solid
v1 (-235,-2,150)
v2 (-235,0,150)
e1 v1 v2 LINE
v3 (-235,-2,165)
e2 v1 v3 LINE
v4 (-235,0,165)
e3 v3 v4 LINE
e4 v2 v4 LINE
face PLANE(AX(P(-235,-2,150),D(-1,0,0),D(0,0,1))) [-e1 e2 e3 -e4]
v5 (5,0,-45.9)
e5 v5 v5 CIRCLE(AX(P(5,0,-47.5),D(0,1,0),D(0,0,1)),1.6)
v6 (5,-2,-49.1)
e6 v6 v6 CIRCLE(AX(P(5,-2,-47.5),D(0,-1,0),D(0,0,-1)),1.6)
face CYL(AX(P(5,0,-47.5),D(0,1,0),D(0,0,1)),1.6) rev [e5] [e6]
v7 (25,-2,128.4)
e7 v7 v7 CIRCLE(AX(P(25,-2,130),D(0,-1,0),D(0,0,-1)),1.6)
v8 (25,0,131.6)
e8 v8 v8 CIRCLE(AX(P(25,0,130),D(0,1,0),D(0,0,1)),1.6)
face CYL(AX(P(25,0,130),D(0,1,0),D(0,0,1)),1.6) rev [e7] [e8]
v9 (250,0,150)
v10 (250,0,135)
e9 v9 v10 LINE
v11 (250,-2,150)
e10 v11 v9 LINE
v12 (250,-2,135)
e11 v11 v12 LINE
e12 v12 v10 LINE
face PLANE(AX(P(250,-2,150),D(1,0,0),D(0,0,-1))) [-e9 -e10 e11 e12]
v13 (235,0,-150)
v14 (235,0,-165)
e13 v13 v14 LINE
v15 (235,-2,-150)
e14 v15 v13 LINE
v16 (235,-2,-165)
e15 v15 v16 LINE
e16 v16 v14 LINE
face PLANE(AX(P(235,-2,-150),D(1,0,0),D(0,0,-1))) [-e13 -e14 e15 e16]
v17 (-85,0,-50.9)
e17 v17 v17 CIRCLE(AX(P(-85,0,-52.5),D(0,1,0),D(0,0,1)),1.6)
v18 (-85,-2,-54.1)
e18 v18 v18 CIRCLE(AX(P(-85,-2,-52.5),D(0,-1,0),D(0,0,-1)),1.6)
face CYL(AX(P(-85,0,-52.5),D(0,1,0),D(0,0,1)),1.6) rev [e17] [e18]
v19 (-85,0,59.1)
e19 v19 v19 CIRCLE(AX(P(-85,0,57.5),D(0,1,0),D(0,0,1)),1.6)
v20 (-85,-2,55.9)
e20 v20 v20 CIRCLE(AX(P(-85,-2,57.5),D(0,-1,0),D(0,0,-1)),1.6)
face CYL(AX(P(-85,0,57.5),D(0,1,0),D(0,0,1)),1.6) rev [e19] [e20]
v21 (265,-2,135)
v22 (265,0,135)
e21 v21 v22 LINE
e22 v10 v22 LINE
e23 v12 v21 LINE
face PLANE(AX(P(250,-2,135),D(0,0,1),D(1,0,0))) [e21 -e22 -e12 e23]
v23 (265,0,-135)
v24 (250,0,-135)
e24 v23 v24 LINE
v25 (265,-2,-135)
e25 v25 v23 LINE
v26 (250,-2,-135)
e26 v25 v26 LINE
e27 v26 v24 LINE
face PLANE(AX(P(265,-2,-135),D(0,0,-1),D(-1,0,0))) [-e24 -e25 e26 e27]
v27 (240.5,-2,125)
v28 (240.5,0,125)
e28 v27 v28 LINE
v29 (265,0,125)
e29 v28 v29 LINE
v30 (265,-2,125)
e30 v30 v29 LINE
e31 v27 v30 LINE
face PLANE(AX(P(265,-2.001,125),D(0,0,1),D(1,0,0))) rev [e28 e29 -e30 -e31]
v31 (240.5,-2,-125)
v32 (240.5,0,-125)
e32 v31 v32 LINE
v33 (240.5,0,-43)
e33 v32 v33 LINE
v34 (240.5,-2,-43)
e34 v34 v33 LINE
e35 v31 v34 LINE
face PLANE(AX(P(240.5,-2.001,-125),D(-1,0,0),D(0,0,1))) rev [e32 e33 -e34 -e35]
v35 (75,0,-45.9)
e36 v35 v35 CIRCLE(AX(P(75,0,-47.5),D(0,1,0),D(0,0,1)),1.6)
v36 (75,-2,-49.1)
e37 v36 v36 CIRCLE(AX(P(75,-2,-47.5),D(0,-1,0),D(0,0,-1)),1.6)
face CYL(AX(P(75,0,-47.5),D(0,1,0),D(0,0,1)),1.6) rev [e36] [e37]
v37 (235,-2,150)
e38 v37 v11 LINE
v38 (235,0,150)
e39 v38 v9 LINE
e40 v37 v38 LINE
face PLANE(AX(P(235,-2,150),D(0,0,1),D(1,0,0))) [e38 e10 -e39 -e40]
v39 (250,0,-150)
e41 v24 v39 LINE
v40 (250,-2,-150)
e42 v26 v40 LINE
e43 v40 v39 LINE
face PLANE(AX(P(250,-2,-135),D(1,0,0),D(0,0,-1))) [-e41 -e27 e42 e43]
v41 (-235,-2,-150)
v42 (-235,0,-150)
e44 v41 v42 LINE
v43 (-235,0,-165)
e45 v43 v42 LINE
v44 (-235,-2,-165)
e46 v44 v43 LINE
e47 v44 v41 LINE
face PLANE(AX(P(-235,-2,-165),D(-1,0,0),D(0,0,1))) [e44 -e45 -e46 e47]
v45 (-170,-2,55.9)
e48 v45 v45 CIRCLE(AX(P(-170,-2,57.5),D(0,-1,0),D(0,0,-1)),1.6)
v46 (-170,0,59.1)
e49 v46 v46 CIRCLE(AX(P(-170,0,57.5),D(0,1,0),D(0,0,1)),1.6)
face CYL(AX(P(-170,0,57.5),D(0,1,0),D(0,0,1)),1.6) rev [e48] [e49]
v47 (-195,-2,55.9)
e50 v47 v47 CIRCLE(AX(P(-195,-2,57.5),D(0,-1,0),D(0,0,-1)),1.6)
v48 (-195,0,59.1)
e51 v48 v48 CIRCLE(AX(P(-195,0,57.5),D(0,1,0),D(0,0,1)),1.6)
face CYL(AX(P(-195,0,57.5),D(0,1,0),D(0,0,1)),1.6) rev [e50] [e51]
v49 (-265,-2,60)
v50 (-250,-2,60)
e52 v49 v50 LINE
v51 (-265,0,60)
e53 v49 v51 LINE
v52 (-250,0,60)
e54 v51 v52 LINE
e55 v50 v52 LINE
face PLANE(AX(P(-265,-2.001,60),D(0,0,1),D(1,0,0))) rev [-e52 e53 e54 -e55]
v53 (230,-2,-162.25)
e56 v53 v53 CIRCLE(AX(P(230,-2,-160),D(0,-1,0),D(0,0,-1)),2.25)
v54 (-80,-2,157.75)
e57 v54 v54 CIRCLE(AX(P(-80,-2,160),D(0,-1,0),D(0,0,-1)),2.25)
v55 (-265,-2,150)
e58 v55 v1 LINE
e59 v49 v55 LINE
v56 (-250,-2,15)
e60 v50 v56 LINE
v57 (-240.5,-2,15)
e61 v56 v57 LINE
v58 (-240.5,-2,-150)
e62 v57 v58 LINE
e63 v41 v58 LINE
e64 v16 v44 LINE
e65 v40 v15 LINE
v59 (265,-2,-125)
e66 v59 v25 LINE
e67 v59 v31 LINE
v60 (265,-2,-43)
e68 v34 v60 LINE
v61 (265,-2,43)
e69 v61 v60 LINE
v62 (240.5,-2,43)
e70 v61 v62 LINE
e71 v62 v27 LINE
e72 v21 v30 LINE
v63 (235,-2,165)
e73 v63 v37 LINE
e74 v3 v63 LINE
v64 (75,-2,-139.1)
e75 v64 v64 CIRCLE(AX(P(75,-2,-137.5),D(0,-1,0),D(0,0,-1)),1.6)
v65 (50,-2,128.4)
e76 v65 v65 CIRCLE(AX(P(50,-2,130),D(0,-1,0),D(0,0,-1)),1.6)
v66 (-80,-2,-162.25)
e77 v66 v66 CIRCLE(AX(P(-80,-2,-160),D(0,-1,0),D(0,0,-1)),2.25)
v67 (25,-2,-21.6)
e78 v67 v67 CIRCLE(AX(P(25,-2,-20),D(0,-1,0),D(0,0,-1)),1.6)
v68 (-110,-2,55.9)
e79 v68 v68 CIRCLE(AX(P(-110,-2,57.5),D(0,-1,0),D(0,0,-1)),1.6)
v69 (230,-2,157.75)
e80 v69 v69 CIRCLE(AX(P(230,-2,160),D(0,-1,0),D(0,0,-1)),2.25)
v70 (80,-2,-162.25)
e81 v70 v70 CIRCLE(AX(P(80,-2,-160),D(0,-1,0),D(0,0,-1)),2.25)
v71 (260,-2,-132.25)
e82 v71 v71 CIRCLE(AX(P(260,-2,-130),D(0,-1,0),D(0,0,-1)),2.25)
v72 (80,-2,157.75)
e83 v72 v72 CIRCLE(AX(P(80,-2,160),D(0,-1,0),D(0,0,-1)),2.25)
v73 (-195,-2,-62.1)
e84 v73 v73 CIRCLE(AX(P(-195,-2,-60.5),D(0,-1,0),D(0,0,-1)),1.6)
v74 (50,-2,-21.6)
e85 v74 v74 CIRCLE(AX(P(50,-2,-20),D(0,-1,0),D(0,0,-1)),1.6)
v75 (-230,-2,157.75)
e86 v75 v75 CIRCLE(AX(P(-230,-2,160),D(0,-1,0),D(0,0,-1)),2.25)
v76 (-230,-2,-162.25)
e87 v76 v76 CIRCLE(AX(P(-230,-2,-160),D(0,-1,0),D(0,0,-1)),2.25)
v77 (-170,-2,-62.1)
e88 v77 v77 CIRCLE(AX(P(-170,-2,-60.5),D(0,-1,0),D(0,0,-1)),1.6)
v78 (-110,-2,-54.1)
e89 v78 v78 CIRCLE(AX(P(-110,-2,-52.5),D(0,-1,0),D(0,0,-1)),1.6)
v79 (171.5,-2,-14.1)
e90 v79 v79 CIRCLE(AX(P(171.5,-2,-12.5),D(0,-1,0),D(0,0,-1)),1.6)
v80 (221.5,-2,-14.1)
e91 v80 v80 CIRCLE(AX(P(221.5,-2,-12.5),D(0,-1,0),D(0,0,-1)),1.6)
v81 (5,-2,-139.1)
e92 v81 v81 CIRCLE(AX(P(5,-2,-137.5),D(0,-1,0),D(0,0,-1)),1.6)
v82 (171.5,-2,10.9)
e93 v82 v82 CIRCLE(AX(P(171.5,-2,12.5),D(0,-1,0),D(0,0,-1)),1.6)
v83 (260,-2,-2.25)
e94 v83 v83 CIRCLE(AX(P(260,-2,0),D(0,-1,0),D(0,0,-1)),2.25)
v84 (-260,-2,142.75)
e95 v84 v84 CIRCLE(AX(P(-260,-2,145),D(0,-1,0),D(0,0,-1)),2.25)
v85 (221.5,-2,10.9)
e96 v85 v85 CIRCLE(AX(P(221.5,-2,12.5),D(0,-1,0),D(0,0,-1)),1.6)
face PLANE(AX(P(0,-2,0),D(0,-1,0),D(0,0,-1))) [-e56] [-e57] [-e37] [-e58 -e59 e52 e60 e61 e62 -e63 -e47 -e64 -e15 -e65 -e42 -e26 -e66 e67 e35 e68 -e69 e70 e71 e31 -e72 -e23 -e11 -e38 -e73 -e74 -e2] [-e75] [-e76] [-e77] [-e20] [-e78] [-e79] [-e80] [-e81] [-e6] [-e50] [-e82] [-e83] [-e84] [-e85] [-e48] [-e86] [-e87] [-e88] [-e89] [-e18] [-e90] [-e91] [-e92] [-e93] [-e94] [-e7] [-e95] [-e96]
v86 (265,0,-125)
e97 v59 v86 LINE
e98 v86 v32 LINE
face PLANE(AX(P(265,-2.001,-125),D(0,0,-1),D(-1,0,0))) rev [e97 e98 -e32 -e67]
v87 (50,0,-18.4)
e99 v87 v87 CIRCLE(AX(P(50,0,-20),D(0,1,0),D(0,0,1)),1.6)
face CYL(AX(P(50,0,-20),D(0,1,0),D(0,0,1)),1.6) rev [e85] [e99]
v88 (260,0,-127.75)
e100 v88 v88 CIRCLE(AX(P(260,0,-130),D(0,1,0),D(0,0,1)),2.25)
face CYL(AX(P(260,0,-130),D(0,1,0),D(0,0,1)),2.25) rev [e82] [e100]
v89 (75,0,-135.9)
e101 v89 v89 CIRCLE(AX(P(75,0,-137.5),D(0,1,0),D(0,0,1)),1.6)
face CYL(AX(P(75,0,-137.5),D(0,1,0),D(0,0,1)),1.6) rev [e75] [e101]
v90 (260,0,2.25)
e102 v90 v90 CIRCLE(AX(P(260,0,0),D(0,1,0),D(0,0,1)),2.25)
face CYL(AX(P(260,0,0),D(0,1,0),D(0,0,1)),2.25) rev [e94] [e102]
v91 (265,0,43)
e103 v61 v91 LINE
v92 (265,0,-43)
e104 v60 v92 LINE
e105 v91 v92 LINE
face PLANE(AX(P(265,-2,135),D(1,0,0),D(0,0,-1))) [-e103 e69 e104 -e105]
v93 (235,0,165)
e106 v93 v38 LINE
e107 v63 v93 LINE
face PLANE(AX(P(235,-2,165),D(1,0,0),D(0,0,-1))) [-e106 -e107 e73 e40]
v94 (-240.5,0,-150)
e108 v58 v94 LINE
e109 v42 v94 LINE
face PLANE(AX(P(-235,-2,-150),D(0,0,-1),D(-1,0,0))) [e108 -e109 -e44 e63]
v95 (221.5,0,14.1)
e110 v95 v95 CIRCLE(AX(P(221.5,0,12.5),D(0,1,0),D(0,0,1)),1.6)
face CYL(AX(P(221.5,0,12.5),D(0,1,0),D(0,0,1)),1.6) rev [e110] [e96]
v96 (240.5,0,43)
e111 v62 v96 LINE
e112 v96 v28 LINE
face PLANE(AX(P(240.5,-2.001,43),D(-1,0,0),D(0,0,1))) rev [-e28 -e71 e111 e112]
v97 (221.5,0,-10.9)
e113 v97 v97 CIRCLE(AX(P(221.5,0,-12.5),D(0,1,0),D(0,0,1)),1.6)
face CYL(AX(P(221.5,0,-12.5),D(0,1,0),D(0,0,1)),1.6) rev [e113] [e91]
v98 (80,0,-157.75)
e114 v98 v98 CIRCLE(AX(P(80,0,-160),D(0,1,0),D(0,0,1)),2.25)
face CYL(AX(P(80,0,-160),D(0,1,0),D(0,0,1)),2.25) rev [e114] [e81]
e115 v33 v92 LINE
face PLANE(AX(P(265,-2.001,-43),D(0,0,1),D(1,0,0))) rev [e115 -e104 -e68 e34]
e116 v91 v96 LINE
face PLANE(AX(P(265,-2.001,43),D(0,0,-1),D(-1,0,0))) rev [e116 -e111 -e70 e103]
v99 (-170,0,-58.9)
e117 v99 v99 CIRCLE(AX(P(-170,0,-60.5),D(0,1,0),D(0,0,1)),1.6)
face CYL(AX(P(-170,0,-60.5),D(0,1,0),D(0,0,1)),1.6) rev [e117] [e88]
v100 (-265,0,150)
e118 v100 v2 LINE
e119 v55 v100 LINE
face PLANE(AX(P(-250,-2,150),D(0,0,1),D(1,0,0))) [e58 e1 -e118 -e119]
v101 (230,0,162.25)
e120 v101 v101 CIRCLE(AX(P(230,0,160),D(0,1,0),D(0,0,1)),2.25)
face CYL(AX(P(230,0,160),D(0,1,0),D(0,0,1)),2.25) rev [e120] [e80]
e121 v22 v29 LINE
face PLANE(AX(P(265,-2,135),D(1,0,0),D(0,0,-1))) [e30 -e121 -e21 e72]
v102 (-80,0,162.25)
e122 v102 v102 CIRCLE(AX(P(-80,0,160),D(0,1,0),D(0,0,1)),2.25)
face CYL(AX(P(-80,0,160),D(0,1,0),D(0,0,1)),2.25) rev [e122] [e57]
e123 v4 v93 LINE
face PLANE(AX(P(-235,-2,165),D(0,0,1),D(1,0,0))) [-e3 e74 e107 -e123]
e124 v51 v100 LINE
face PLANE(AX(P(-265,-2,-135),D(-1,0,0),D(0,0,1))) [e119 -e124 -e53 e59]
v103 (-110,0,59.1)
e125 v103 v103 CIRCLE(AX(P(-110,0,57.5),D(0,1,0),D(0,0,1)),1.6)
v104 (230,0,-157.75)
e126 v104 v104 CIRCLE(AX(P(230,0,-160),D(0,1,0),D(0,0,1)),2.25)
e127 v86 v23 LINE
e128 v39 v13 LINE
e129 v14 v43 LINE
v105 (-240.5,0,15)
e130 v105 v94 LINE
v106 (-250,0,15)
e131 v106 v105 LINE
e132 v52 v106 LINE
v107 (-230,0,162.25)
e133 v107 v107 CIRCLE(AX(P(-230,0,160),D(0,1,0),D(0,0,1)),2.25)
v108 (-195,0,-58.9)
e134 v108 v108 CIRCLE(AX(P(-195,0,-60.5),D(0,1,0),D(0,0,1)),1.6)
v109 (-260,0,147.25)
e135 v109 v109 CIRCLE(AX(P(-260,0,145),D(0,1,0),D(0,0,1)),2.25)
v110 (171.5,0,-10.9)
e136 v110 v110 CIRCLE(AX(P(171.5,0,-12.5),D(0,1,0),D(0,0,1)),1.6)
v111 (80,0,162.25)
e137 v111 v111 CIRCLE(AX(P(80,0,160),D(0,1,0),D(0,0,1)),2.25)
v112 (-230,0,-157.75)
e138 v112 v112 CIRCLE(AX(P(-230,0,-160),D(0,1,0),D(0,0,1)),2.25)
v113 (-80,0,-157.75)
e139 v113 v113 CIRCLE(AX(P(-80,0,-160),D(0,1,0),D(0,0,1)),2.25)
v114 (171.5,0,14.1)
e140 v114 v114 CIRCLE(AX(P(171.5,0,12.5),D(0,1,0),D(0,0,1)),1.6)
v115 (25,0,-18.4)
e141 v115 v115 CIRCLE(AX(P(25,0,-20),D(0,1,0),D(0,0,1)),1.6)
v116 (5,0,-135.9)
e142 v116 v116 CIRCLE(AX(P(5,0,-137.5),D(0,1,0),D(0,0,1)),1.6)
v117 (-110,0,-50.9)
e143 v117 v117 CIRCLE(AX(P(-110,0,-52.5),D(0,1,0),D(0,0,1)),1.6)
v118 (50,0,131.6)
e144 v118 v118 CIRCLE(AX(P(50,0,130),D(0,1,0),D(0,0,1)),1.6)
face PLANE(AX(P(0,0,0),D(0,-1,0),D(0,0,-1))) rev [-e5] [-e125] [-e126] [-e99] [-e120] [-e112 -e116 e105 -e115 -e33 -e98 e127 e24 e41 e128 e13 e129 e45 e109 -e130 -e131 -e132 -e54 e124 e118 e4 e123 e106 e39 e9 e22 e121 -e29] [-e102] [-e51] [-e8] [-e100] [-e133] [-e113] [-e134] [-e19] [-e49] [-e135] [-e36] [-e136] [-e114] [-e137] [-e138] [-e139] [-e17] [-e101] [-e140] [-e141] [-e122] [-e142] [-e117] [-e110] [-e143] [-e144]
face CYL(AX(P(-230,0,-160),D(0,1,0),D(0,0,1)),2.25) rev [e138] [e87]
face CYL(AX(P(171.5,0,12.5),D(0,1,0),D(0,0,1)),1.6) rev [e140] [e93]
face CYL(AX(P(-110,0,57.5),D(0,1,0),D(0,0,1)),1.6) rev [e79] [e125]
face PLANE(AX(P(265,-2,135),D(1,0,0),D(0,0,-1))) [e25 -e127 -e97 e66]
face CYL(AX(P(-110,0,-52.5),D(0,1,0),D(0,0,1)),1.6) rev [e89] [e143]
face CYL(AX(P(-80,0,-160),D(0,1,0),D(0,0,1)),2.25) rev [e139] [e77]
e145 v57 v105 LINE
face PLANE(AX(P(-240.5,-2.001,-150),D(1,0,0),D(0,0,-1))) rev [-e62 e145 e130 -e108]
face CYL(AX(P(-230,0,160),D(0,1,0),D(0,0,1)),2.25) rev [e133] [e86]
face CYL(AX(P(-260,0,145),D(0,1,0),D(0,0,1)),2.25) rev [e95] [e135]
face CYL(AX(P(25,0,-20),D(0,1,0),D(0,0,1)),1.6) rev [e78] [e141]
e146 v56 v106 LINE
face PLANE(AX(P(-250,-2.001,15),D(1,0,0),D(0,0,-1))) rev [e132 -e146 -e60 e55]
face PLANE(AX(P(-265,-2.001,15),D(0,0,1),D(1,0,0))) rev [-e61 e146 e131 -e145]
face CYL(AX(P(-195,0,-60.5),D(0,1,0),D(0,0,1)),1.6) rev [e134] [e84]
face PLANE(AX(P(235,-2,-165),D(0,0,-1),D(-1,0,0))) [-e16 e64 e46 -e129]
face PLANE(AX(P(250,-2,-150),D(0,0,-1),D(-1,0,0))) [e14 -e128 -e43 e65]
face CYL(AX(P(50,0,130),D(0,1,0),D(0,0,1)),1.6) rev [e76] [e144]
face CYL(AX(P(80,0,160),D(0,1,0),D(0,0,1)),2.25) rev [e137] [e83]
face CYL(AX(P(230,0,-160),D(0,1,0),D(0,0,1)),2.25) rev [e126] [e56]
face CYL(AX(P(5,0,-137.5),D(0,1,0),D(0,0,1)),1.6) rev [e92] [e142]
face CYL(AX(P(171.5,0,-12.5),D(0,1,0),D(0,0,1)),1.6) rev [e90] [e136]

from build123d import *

# Parameters (mm, degrees)
BASE_FLANGE1_DEPTH       = 2
SKETCH3_W                = 15
SKETCH3_H                = 15
TAB1_DEPTH               = 2
CUT_EXTRUDE1_REACH       = 314.176
SKETCH4_W                = 15
SKETCH4_H                = 45
M4_CLEARANCE_HOLE1_D     = 4.5
M4_CLEARANCE_HOLE1_DEPTH = 2
M3_CLEARANCE_HOLE1_D     = 3.2
CUT_EXTRUDE2_REACH       = 314.176
SKETCH10_W               = 24.5
SKETCH10_H               = 82
CUT_EXTRUDE3_REACH       = 314.176
SKETCH11_W               = 24.5
SKETCH11_H               = 165


# Sheet-metal steps are written as plain solids
with BuildPart() as part:
    # Sketch1 → Base-Flange1 (new body)
    with BuildSketch(Plane(origin=(0, 0, 0), x_dir=(1, 0, 0), z_dir=(0, 1, 0))):
        Polygon((-250, -150), (-235, -150), (-235, -165), (235, -165), (235, -150), (250, -150), (250, -135), (265, -135), (265, 135), (250, 135), (250, 150), (235, 150), (235, 165), (-235, 165), (-235, 150), (-250, 150), (-250, 135), (-265, 135), (-265, -135), (-250, -135), align=None)
    extrude(amount=-BASE_FLANGE1_DEPTH)

    # Sketch3 → Tab1 (add)
    with BuildSketch(Plane(origin=(0, 0, 0), x_dir=(1, 0, 0), z_dir=(0, 1, 0))):
        with Locations((-257.5, -142.5)):
            Rectangle(SKETCH3_W, SKETCH3_H)
    extrude(amount=-TAB1_DEPTH)

    # Sketch4 → Cut-Extrude1 (cut, up to next)
    with BuildSketch(Plane(origin=(0, 0, 0), x_dir=(1, 0, 0), z_dir=(0, 1, 0)), mode=Mode.PRIVATE) as cut_extrude1_sk1:
        with Locations((-257.5, -37.5)):
            Rectangle(SKETCH4_W, SKETCH4_H)
    cut_extrude1_tool1 = extrude(cut_extrude1_sk1.sketch, amount=-CUT_EXTRUDE1_REACH, mode=Mode.PRIVATE) & part.part
    add(cut_extrude1_tool1.solids().sort_by_distance((-257.5, 0, 37.5))[0], mode=Mode.SUBTRACT)

    # M4 Clearance Hole1
    with Locations(Plane(origin=(0, 0, 0), x_dir=(1, 0, 0), z_dir=(0, 1, 0))):
        with Locations((-260, -145), (-260, 0), (-260, 130), (-230, 160), (-80, 160), (80, 160), (230, 160), (260, 130), (260, 0), (260, -145), (230, -160), (80, -160), (-80, -160), (-230, -160)):
            Hole(M4_CLEARANCE_HOLE1_D / 2, depth=M4_CLEARANCE_HOLE1_DEPTH)

    # M3 Clearance Hole1 (through all)
    with Locations(Plane(origin=(0, 0, 0), x_dir=(1, 0, 0), z_dir=(0, 1, 0))):
        with Locations((221.5, -12.5), (171.5, -12.5), (171.5, 12.5), (221.5, 12.5), (75, 137.5), (5, 47.5), (75, 47.5), (5, 137.5), (-85, 52.5), (-110, -57.5), (-85, -57.5), (-110, 52.5), (-170, -57.5), (-195, 60.5), (-170, 60.5), (-195, -57.5), (25, 20), (50, -130), (25, -130), (50, 20)):
            Hole(M3_CLEARANCE_HOLE1_D / 2)

    # Sketch10 → Cut-Extrude2 (cut, up to next)
    with BuildSketch(Plane(origin=(0, 0, 0), x_dir=(1, 0, 0), z_dir=(0, 1, 0)), mode=Mode.PRIVATE) as cut_extrude2_sk1:
        with Locations((252.75, 84)):
            Rectangle(SKETCH10_W, SKETCH10_H)
    cut_extrude2_tool1 = extrude(cut_extrude2_sk1.sketch, amount=-CUT_EXTRUDE2_REACH, mode=Mode.PRIVATE) & part.part
    # Sketch10 → Cut-Extrude2 (cut, up to next)
    with BuildSketch(Plane(origin=(0, 0, 0), x_dir=(1, 0, 0), z_dir=(0, 1, 0)), mode=Mode.PRIVATE) as cut_extrude2_sk2:
        with Locations((252.75, -84)):
            Rectangle(SKETCH10_W, SKETCH10_H)
    cut_extrude2_tool2 = extrude(cut_extrude2_sk2.sketch, amount=-CUT_EXTRUDE2_REACH, mode=Mode.PRIVATE) & part.part
    add(cut_extrude2_tool1.solids().sort_by_distance((252.75, 0, -84))[0], mode=Mode.SUBTRACT)
    add(cut_extrude2_tool2.solids().sort_by_distance((252.75, 0, 84))[0], mode=Mode.SUBTRACT)

    # Sketch11 → Cut-Extrude3 (cut, up to next)
    with BuildSketch(Plane(origin=(0, 0, 0), x_dir=(1, 0, 0), z_dir=(0, 1, 0)), mode=Mode.PRIVATE) as cut_extrude3_sk1:
        with Locations((-252.75, 67.5)):
            Rectangle(SKETCH11_W, SKETCH11_H)
    cut_extrude3_tool1 = extrude(cut_extrude3_sk1.sketch, amount=-CUT_EXTRUDE3_REACH, mode=Mode.PRIVATE) & part.part
    add(cut_extrude3_tool1.solids().sort_by_distance((-252.75, 0, -67.5))[0], mode=Mode.SUBTRACT)


solid = part.part
